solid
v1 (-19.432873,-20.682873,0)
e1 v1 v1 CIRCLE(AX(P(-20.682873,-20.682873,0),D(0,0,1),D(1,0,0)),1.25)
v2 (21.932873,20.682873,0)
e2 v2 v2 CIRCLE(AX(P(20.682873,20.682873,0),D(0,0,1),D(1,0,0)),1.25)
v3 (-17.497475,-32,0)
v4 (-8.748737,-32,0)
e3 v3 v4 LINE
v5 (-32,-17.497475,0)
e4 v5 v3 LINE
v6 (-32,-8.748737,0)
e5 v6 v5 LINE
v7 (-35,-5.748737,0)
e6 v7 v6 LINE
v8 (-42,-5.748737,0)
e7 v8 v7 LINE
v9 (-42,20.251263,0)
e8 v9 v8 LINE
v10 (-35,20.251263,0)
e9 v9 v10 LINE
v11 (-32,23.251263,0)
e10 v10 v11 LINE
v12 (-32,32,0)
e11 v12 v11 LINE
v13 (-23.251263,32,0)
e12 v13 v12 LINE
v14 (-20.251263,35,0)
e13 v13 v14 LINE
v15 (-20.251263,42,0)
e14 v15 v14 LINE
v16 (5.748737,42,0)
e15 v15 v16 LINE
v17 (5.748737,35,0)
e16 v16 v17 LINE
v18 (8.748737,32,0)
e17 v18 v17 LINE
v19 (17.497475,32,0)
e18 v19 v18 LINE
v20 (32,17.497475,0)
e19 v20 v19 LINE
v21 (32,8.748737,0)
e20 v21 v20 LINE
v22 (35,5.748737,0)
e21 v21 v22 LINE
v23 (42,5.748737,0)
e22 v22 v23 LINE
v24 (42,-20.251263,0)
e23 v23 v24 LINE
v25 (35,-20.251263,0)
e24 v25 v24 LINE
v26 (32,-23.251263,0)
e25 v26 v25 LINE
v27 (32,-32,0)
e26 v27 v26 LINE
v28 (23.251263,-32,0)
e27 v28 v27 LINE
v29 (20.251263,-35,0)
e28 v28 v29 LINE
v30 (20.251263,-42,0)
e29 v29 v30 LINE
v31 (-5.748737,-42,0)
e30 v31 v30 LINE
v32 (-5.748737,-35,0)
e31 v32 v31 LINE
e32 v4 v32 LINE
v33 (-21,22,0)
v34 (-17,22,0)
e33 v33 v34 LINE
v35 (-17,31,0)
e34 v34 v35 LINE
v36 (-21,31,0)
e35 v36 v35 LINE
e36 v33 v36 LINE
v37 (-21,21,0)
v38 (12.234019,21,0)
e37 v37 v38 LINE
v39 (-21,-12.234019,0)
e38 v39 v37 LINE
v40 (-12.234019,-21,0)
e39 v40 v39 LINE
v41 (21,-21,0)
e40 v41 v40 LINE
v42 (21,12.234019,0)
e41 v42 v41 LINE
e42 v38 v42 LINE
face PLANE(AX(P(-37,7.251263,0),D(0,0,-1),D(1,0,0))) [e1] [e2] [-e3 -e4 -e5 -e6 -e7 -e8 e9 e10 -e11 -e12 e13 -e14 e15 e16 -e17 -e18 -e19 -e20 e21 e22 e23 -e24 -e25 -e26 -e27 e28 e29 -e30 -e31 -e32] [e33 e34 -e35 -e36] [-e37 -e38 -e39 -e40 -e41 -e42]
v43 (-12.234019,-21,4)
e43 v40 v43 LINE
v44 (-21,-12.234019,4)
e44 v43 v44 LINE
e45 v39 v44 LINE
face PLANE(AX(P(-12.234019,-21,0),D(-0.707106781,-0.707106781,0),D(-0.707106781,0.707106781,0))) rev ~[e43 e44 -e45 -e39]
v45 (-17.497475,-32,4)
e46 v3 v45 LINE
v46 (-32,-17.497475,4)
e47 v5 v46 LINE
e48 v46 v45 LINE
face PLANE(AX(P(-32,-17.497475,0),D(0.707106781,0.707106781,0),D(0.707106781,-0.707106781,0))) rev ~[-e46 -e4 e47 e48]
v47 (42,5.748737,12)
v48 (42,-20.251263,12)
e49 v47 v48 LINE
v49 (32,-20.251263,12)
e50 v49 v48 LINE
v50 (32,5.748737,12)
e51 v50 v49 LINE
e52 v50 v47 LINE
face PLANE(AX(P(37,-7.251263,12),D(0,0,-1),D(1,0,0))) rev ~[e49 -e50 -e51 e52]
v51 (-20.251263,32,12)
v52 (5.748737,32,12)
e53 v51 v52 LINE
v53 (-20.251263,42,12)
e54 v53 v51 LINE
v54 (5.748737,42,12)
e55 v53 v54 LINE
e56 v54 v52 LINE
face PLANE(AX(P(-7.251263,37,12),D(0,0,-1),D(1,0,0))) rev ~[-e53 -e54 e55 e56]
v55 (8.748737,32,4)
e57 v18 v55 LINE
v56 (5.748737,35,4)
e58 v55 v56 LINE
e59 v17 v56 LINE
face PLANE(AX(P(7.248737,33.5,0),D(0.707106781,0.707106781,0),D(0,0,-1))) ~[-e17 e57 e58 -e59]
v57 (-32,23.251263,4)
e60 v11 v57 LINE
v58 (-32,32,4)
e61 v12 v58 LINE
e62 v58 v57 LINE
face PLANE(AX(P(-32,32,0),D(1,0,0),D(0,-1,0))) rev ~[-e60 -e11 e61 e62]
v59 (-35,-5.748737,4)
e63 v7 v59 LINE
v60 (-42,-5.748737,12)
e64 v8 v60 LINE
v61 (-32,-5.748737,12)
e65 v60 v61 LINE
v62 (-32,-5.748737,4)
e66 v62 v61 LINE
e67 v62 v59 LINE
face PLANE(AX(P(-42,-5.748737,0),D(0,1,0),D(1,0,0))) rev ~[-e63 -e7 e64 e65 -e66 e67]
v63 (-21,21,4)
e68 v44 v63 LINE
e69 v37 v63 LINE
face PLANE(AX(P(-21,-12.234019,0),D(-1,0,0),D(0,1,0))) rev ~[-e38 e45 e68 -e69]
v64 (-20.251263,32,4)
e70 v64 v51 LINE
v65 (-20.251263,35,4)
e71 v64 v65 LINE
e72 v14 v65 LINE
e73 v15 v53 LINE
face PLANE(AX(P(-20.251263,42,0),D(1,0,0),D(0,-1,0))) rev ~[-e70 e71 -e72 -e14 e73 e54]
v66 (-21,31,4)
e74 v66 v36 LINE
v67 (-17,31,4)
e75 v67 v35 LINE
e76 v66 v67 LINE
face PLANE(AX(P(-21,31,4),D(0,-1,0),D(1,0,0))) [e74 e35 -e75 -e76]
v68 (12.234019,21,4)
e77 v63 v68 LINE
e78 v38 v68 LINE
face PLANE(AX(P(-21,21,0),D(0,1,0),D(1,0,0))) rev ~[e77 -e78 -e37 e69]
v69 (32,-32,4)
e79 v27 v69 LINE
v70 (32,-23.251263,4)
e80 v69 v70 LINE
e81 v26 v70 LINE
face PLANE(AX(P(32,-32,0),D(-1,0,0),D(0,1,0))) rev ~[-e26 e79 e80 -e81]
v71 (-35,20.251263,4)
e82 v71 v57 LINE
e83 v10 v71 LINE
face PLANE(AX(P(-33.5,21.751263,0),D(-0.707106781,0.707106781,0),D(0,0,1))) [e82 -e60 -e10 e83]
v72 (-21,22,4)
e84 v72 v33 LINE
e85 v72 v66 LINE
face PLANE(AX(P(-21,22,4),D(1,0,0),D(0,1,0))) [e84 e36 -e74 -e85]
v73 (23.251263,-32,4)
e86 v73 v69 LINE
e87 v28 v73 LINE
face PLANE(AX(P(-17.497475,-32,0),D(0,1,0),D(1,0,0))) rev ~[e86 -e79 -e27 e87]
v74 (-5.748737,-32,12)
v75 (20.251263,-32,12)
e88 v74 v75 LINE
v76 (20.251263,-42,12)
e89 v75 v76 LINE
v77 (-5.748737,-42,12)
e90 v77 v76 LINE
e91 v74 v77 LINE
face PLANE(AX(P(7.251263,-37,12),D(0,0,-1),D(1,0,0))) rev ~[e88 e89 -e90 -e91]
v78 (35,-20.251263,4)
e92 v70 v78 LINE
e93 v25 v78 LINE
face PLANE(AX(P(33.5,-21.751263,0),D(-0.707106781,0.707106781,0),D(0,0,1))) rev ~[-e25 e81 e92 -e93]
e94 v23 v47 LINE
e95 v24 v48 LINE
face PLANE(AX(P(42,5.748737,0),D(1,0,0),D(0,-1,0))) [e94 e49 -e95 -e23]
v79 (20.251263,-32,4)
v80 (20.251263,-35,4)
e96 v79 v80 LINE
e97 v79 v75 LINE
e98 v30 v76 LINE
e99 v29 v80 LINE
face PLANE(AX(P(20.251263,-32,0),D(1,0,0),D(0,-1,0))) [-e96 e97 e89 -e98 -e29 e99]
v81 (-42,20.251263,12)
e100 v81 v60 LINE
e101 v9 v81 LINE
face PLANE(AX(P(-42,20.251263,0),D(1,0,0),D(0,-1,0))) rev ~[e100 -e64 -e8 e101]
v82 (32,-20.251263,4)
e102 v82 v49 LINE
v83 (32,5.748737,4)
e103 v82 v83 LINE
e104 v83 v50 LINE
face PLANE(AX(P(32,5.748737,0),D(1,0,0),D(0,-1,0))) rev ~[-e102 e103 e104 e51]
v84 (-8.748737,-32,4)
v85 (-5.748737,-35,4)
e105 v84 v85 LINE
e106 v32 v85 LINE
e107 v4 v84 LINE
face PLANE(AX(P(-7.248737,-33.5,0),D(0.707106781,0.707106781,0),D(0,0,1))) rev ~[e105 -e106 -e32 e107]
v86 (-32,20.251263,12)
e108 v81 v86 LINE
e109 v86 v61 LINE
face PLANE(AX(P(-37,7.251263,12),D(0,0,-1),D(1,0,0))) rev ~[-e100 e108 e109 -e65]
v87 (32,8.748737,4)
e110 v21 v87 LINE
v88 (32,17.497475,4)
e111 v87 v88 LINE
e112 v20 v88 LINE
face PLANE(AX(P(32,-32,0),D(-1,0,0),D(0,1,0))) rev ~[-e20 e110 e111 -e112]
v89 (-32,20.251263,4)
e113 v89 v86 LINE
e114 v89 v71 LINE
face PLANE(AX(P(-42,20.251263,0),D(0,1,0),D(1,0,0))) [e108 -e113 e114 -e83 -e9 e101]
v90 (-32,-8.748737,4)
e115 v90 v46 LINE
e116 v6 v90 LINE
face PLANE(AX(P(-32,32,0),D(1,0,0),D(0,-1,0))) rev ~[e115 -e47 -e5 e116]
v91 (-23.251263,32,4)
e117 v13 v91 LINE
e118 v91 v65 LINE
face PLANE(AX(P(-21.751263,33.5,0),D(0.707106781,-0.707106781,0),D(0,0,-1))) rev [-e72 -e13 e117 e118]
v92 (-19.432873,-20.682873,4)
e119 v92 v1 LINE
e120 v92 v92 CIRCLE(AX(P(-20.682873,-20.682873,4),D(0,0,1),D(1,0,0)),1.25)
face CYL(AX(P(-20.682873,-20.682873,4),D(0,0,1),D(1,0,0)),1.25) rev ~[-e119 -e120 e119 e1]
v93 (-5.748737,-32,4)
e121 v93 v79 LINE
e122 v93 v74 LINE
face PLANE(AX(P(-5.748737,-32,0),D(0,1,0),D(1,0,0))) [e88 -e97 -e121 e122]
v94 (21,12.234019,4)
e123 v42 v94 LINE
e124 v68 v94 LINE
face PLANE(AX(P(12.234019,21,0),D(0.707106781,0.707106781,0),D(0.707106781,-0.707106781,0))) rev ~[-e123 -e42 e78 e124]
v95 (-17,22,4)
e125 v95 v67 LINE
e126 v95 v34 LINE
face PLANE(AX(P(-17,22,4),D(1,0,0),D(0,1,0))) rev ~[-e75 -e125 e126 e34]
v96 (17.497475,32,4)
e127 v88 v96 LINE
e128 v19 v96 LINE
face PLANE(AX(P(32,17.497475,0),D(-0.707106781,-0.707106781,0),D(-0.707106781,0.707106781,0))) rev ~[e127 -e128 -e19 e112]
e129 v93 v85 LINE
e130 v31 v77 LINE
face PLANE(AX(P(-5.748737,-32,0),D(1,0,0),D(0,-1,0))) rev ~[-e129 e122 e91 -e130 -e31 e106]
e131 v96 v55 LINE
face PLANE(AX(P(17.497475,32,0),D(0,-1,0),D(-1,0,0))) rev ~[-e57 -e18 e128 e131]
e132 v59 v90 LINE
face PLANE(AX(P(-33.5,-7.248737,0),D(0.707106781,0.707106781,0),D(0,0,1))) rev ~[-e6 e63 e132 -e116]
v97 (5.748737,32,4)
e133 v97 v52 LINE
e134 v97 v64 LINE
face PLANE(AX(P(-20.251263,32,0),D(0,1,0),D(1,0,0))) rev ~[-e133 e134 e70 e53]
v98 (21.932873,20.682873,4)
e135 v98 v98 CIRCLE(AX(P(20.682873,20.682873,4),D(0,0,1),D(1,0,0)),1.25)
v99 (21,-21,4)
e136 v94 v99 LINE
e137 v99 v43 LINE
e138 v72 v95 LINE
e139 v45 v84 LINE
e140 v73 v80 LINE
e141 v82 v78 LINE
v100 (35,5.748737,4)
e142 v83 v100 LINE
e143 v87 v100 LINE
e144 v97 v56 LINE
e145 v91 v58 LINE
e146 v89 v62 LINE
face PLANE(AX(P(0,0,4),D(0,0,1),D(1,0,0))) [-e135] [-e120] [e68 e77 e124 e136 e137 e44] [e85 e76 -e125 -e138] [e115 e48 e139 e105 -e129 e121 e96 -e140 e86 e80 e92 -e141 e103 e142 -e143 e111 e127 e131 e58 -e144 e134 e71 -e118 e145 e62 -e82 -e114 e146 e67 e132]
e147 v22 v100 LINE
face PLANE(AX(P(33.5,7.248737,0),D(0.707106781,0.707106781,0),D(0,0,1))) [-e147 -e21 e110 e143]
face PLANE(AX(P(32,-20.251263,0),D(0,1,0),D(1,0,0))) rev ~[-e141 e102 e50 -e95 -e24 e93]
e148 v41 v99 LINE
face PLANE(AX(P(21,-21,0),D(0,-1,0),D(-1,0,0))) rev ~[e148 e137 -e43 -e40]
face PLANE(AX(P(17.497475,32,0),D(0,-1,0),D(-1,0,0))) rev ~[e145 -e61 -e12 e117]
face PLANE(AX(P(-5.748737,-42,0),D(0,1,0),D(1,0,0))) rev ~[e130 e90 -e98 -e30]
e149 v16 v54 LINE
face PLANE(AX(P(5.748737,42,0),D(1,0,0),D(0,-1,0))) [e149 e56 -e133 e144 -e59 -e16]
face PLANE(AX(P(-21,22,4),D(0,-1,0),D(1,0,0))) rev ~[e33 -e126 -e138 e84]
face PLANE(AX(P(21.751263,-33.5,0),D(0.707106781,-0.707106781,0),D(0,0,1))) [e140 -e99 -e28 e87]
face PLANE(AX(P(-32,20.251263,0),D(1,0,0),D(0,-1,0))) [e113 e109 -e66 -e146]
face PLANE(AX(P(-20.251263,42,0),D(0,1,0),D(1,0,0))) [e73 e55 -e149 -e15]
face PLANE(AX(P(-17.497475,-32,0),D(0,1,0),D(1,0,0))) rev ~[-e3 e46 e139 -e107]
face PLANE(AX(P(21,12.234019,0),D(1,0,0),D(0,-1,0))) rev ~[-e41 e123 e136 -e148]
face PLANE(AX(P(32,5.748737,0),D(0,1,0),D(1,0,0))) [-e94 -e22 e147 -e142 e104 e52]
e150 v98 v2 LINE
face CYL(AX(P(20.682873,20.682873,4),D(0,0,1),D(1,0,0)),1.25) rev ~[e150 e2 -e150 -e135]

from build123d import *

# Parameters (mm, degrees)
F1_DEPTH = 4
F2_R     = 1.25
F3_DEPTH = 4.001
F4_W     = 4
F4_H     = 9
F5_DEPTH = 4.001
F6_W     = 10
F6_H     = 26
F6_W_2   = 26
F6_H_2   = 10
F7_DEPTH = 12
F8_SIZE  = 3


with BuildPart() as f1:
    # F0 (on Top) → F1 (new body)
    with BuildSketch(Plane.XY):
        Polygon((17.4974746831, 32), (-32, 32), (-32, -17.4974746831), (-17.4974746831, -32), (32, -32), (32, 17.4974746831), align=None)
        Polygon((-21, -12.2340187158), (-21, 21), (12.2340187158, 21), (21, 21), (21, 12.2340187158), (21, -21), (-12.2340187158, -21), (-21, -21), align=None, mode=Mode.SUBTRACT)
        Polygon((-12.2340187158, -21), (-21, -12.2340187158), (-21, -21), align=None)
        Polygon((21, 21), (12.2340187158, 21), (21, 12.2340187158), align=None)
    extrude(amount=F1_DEPTH)

    # F2 (on face) → F3 (cut, through all)
    with BuildSketch(Plane.XY.offset(4)):
        with Locations((-20.6828733497, -20.6828733497)):
            Circle(F2_R)
        with Locations((20.6828733497, 20.6828733497)):
            Circle(F2_R)
    extrude(amount=-F3_DEPTH, mode=Mode.SUBTRACT)

    # F4 (on face) → F5 (cut, through all)
    with BuildSketch(Plane.XY.offset(4)):
        with Locations((-19, 26.5)):
            Rectangle(F4_W, F4_H)
    extrude(amount=-F5_DEPTH, mode=Mode.SUBTRACT)

    # F6 (on face) → F7 (join)
    with BuildSketch(Plane(origin=(0, 0, 0), x_dir=(1, 0, 0), z_dir=(0, 0, -1))):
        with Locations((-37, -7.2512626585)):
            Rectangle(F6_W, F6_H)
        with Locations((7.2512626585, 37)):
            Rectangle(F6_W_2, F6_H_2)
        with Locations((37, 7.2512626585)):
            Rectangle(F6_W, F6_H)
        with Locations((-7.2512626585, -37)):
            Rectangle(F6_W_2, F6_H_2)
    extrude(amount=-F7_DEPTH)

    # F8
    f8_edges = [f1.edges().sort_by_distance(p)[0] for p in [
        (32, 5.748737, 2),
        (32, -20.251263, 2),
        (20.251263, -32, 2),
        (-5.748737, -32, 2),
        (-32, -5.748737, 2),
        (-32, 20.251263, 2),
        (-20.251263, 32, 2),
        (5.748737, 32, 2),
    ]]
    chamfer(f8_edges, length=F8_SIZE)


solid = f1.part
